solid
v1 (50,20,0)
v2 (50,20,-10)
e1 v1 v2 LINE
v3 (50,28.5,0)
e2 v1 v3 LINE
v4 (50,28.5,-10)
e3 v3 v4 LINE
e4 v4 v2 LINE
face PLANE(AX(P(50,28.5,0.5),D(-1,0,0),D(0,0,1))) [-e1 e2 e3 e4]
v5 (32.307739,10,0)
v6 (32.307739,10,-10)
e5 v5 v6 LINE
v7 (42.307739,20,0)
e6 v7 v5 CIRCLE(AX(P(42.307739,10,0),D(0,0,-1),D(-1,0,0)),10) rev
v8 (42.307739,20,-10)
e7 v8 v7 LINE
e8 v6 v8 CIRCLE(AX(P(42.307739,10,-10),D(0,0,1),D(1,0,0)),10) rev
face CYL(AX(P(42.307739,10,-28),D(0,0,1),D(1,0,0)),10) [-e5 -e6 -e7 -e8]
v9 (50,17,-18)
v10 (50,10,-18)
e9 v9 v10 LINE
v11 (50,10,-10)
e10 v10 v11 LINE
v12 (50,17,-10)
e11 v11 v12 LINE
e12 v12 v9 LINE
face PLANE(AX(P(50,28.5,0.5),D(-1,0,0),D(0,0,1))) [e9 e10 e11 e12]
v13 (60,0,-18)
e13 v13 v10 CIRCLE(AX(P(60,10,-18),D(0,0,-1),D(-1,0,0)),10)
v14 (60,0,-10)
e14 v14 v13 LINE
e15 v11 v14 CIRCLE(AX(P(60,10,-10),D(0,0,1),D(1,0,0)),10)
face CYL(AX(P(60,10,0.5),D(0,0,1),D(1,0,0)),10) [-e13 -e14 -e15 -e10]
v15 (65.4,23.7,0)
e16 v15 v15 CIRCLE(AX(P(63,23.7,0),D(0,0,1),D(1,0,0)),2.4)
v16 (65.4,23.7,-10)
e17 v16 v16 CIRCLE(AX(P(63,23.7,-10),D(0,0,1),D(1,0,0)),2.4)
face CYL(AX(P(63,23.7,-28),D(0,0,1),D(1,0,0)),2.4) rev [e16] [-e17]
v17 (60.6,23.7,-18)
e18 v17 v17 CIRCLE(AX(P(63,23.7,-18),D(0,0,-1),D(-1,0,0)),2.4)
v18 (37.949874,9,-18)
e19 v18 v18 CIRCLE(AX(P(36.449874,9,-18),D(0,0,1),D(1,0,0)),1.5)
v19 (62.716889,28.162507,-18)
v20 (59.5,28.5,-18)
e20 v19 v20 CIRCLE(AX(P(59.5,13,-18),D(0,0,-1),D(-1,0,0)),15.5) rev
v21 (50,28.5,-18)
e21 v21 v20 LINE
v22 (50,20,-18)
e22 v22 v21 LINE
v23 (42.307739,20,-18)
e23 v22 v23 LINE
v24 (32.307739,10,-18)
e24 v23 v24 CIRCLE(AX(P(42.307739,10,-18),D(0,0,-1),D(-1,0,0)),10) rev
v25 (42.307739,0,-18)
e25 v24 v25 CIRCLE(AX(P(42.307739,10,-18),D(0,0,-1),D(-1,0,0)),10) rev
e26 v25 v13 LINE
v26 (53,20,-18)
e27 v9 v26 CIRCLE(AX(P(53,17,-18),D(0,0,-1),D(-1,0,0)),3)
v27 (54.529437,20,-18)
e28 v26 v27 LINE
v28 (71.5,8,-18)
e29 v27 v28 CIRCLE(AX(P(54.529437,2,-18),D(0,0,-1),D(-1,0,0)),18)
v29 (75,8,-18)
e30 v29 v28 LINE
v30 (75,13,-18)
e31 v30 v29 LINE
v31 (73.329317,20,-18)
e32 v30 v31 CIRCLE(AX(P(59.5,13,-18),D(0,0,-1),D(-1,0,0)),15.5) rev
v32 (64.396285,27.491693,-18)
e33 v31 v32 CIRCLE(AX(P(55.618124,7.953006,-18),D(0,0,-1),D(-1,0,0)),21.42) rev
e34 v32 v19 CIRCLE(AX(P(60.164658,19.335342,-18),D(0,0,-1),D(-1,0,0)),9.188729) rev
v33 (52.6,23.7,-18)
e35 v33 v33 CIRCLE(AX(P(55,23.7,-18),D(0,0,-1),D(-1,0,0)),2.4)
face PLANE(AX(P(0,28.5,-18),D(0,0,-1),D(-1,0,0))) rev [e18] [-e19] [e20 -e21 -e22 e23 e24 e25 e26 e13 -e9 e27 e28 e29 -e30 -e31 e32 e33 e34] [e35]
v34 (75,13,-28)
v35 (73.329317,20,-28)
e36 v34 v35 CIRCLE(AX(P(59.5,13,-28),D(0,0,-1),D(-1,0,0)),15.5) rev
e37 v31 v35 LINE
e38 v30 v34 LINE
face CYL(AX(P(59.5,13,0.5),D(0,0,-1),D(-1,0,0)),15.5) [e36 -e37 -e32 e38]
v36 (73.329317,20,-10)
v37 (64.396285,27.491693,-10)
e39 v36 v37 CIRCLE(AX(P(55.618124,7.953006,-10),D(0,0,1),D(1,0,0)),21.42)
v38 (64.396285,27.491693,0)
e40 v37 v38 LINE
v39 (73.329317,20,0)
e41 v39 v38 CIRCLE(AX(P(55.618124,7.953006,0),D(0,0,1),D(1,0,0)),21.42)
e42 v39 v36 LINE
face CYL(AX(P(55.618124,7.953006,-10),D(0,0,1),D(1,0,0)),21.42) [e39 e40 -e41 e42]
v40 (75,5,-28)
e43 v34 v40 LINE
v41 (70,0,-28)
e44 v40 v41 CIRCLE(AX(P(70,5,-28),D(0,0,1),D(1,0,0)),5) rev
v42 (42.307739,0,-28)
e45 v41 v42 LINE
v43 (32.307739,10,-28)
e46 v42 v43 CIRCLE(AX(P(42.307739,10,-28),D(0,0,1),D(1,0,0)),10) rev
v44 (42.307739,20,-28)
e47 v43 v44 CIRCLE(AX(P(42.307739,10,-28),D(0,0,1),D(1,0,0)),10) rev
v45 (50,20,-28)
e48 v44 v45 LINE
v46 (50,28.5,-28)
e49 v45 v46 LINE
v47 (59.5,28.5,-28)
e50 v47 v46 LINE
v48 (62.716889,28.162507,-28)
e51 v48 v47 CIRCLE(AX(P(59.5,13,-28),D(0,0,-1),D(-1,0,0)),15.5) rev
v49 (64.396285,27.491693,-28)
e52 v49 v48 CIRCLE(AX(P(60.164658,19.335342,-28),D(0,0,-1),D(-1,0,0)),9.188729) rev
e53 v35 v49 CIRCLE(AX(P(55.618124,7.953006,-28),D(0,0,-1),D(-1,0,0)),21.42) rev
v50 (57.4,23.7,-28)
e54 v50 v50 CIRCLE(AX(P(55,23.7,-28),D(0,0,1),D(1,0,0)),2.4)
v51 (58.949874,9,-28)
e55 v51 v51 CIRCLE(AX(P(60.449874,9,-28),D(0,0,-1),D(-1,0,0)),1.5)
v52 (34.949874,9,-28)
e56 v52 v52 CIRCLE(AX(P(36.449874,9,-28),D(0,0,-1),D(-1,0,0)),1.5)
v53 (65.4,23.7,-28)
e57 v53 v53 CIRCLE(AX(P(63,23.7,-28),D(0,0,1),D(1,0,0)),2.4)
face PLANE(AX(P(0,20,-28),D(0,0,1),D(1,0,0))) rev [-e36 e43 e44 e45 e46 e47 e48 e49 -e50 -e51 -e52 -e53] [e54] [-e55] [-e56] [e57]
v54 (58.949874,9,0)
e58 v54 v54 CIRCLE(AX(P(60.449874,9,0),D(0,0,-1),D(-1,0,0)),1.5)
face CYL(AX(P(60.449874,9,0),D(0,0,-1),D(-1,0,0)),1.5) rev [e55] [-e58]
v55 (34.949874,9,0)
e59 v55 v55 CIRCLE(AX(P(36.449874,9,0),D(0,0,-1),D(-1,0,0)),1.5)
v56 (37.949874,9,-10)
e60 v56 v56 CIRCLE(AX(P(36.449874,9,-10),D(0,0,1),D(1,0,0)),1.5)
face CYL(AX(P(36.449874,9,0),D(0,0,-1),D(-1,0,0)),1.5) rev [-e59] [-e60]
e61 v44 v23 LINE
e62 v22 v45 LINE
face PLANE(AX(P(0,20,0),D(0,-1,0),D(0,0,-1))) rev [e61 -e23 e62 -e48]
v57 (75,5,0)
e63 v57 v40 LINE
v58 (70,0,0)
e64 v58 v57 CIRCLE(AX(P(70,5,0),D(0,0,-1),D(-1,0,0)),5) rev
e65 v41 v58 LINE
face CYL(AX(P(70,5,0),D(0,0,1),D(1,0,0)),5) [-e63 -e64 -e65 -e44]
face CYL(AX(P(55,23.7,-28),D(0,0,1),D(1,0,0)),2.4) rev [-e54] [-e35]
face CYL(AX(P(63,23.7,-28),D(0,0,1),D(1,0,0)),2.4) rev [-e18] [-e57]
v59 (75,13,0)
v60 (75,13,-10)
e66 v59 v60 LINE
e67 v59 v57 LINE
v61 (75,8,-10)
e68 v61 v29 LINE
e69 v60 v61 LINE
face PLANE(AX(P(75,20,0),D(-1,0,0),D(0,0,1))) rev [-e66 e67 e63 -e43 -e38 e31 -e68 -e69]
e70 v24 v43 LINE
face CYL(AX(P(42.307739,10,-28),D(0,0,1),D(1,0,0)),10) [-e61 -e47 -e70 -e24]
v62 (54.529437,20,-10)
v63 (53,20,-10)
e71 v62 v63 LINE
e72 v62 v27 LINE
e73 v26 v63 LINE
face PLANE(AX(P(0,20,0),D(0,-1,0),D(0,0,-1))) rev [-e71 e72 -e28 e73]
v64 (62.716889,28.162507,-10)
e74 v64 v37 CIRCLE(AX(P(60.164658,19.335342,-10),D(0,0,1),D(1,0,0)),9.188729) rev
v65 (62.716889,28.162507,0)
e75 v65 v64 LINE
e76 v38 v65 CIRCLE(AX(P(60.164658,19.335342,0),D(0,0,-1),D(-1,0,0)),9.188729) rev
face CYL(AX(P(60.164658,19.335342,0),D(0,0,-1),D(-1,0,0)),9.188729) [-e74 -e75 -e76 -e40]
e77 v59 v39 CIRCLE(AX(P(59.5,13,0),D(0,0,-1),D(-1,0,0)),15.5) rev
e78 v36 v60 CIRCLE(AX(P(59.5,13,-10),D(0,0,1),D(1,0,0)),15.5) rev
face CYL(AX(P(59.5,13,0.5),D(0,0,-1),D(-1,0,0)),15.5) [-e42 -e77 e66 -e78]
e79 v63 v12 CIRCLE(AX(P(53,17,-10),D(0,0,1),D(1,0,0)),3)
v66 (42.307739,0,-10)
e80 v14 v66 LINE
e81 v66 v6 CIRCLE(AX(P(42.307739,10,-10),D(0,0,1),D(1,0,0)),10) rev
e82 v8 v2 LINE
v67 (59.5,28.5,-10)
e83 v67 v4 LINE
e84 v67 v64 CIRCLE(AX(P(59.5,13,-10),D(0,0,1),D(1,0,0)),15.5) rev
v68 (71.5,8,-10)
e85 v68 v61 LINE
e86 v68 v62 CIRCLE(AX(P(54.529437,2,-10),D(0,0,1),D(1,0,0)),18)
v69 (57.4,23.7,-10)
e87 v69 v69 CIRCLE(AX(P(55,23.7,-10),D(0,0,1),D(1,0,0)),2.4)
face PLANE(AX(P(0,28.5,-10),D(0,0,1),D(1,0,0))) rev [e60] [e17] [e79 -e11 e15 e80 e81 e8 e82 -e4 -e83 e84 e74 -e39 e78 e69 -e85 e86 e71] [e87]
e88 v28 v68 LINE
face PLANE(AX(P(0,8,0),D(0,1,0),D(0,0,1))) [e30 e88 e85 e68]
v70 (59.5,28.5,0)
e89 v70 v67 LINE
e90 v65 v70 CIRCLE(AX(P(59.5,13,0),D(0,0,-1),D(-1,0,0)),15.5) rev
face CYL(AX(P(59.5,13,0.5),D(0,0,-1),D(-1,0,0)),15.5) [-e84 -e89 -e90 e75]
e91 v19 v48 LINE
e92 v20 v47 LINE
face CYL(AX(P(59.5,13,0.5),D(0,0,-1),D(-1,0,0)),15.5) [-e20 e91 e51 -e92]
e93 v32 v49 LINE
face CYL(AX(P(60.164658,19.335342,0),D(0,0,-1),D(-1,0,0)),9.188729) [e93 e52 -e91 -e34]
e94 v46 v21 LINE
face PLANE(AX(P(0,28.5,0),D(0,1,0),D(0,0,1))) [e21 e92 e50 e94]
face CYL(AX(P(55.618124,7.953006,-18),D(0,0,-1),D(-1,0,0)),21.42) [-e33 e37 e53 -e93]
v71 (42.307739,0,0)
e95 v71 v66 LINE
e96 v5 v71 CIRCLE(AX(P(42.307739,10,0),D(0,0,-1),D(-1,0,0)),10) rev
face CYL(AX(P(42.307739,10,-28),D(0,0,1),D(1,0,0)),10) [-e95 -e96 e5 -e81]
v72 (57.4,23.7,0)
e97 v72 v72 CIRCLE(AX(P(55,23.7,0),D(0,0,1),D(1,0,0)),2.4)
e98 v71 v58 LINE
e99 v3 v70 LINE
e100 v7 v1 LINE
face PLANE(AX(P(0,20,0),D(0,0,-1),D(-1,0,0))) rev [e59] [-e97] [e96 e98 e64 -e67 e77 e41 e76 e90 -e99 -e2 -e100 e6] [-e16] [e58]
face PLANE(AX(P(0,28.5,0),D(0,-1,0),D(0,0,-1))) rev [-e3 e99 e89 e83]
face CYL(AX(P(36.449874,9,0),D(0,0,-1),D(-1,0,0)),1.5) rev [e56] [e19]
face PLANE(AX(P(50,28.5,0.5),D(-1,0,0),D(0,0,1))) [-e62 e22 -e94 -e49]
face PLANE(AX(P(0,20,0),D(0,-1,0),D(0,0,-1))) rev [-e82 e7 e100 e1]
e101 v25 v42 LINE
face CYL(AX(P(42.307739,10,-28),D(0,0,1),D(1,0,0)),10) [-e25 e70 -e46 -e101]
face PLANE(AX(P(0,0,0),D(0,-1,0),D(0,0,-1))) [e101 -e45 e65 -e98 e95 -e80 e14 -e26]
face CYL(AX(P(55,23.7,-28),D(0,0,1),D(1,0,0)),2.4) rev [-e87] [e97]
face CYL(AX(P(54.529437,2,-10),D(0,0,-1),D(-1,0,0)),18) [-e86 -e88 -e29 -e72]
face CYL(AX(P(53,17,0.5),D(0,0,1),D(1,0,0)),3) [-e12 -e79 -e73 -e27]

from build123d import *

# Parameters (mm, degrees)
CROQUIS1_W                 = 75
CROQUIS1_H                 = 28
SALIENTE_EXTRUIR2_DEPTH    = 20
CROQUIS2_W                 = 75
CROQUIS2_H                 = 10
SALIENTE_EXTRUIR3_DEPTH    = 8.5
CROQUIS3_R                 = 2.4
CORTAR_EXTRUIR1_DEPTH      = 28
CROQUIS5_W                 = 3.5
CROQUIS5_H                 = 8
CORTAR_EXTRUIR2_DEPTH      = 12
REDONDEO1_R                = 18
CORTAR_EXTRUIR3_DEPTH      = 18.5
CORTAR_EXTRUIR3_DEPTH_BACK = 9.5
CROQUIS7_W                 = 50
CROQUIS7_H                 = 8.5
CROQUIS8_W                 = 50
CROQUIS8_H                 = 9
CORTAR_EXTRUIR4_DEPTH      = 20.5
REDONDEO2_R                = 10
REDONDEO5_R                = 10
CORTAR_EXTRUIR6_DEPTH      = 28.5
CROQUIS10_R                = 1.5
CORTAR_EXTRUIR7_DEPTH      = 85.977938313
REDONDEO6_R                = 10
REDONDEO7_R                = 3
REDONDEO8_R                = 5
CORTAR_EXTRUIR11_DEPTH     = 85.977938313
SALIENTE_EXTRUIR4_DEPTH    = 10
SALIENTE_EXTRUIR5_START    = -10
SALIENTE_EXTRUIR5_DEPTH    = 10
CORTAR_EXTRUIR12_START     = -0.5
CORTAR_EXTRUIR12_DEPTH     = 0.5
CROQUIS20_R                = 1.5
SALIENTE_EXTRUIR7_DEPTH    = 1
CORTAR_EXTRUIR13_DEPTH     = 85.977938313
CORTAR_EXTRUIR14_DEPTH     = 85.977938313
REDONDEO9_R                = 10


with BuildPart() as part:
    # Croquis1 → Saliente-Extruir2 (new body)
    with BuildSketch(Plane(origin=(0, 0, 0), x_dir=(1, 0, 0), z_dir=(0, 1, 0))):
        with Locations((37.5, 14)):
            Rectangle(CROQUIS1_W, CROQUIS1_H)
    extrude(amount=SALIENTE_EXTRUIR2_DEPTH)

    # Croquis2 → Saliente-Extruir3 (add)
    with BuildSketch(Plane(origin=(0, 20, 0), x_dir=(1, 0, 0), z_dir=(0, 1, 0))):
        with Locations((37.5, 5)):
            Rectangle(CROQUIS2_W, CROQUIS2_H)
        with Locations((37.5, 23)):
            Rectangle(CROQUIS2_W, CROQUIS2_H)
    extrude(amount=SALIENTE_EXTRUIR3_DEPTH)

    # Croquis3 → Cortar-Extruir1 (cut)
    with BuildSketch(Plane.XY):
        with Locations((63, 23.7)):
            Circle(CROQUIS3_R)
        with Locations((55, 23.7)):
            Circle(CROQUIS3_R)
    extrude(amount=-CORTAR_EXTRUIR1_DEPTH, mode=Mode.SUBTRACT)

    # Croquis5 → Cortar-Extruir2 (cut)
    with BuildSketch(Plane(origin=(0, 20, 0), x_dir=(1, 0, 0), z_dir=(0, 1, 0))):
        with Locations((73.25, 14)):
            Rectangle(CROQUIS5_W, CROQUIS5_H)
    extrude(amount=-CORTAR_EXTRUIR2_DEPTH, mode=Mode.SUBTRACT)

    # Redondeo1
    # the kernel refuses this fillet: 18 mm, written as the material it takes off along each edge
    with BuildSketch(Plane(origin=(71.5, 20, -10), x_dir=(0, -1, 0), z_dir=(0, 0, -1))) as redondeo1_piece_1:
        with BuildLine():
            CenterArc((18, 16.970562748), REDONDEO1_R, 180, 70.528779366)
            Line((0, 16.970562748), (0, 0))
            Line((0, 0), (12, 0))
        make_face()
    extrude(amount=8, mode=Mode.SUBTRACT)

    # Croquis7 → Cortar-Extruir3 (cut, two sides: drawn at the far end of the back side and taken through both)
    with BuildSketch(Plane.XY.offset(-18).offset(-CORTAR_EXTRUIR3_DEPTH_BACK)):
        with Locations((25, 24.25)):
            Rectangle(CROQUIS7_W, CROQUIS7_H)
    extrude(amount=CORTAR_EXTRUIR3_DEPTH + CORTAR_EXTRUIR3_DEPTH_BACK, mode=Mode.SUBTRACT)

    # Croquis8 → Cortar-Extruir4 (cut)
    with BuildSketch(Plane(origin=(0, 20, 0), x_dir=(1, 0, 0), z_dir=(0, 1, 0))):
        with Locations((25, 14.5)):
            Rectangle(CROQUIS8_W, CROQUIS8_H)
    extrude(amount=-CORTAR_EXTRUIR4_DEPTH, mode=Mode.SUBTRACT)

    # Redondeo2
    redondeo2_edges = [part.edges().sort_by_distance(p)[0] for p in [
        (0, 20, -5),
        (0, 20, -23.25),
    ]]
    fillet(redondeo2_edges, radius=REDONDEO2_R)

    # Redondeo5
    # the kernel refuses this fillet: 10 mm, written as the material it takes off along each edge
    with BuildSketch(Plane(origin=(0, 0, -35), x_dir=(1, 0, 0), z_dir=(0, 0, 1))) as redondeo5_piece_1:
        with BuildLine():
            CenterArc((REDONDEO5_R, REDONDEO5_R), REDONDEO5_R, 180, 90)
            Line((0, REDONDEO5_R), (0, 0))
            Line((0, 0), (REDONDEO5_R, 0))
        make_face()
    extrude(amount=60, mode=Mode.SUBTRACT)

    # Croquis9 → Cortar-Extruir6 (cut)
    with BuildSketch(Plane(origin=(0, 0, -28), x_dir=(-1, 0, 0), z_dir=(0, 0, -1))):
        with BuildLine():
            Line((-75, 28.5), (-59.5, 28.5))
            ThreePointArc((-59.5, 28.5), (-70.460155108, 23.960155108), (-75, 13))
            Line((-75, 13), (-75, 28.5))
        make_face()
    extrude(amount=-CORTAR_EXTRUIR6_DEPTH, mode=Mode.SUBTRACT)

    # Croquis10 → Cortar-Extruir7 (cut, through all)
    with BuildSketch(Plane(origin=(0, 0, -28), x_dir=(-1, 0, 0), z_dir=(0, 0, -1))):
        with Locations((-60.449874371, 9)):
            Circle(CROQUIS10_R)
        with Locations((-36.449874371, 9)):
            Circle(CROQUIS10_R)
        with Locations((-12.449874371, 9)):
            Circle(CROQUIS10_R)
    extrude(amount=-CORTAR_EXTRUIR7_DEPTH, mode=Mode.SUBTRACT)

    # Redondeo6
    redondeo6_edges = [part.edges().sort_by_distance(p)[0] for p in [
        (50, 0, -14.5),
    ]]
    fillet(redondeo6_edges, radius=REDONDEO6_R)

    # Redondeo7
    # the kernel refuses this fillet: 3 mm, written as the material it takes off along each edge
    with BuildSketch(Plane(origin=(50, 20, -18), x_dir=(0, -1, 0), z_dir=(0, 0, 1))) as redondeo7_piece_1:
        with BuildLine():
            CenterArc((REDONDEO7_R, REDONDEO7_R), REDONDEO7_R, 180, 90)
            Line((0, REDONDEO7_R), (0, 0))
            Line((0, 0), (REDONDEO7_R, 0))
        make_face()
    extrude(amount=8, mode=Mode.SUBTRACT)

    # Redondeo8
    redondeo8_edges = [part.edges().sort_by_distance(p)[0] for p in [
        (75, 0, -14),
    ]]
    fillet(redondeo8_edges, radius=REDONDEO8_R)

    # Croquis16 → Cortar-Extruir11 (cut, through all)
    with BuildSketch(Plane(origin=(0, 0, -28), x_dir=(-1, 0, 0), z_dir=(0, 0, -1))):
        with BuildLine():
            Line((-73.329316686, 20), (-69.329316686, 20))
            ThreePointArc((-69.329316686, 20), (-67.304546525, 25.119348054), (-62.716889054, 28.162507207))
            ThreePointArc((-62.716889054, 28.162507207), (-68.949863148, 25.286174608), (-73.329316686, 20))
        make_face()
    extrude(amount=-CORTAR_EXTRUIR11_DEPTH, mode=Mode.SUBTRACT)

    # Croquis17 → Saliente-Extruir4 (add)
    with BuildSketch(Plane(origin=(0, 0, -28), x_dir=(-1, 0, 0), z_dir=(0, 0, -1))):
        with BuildLine():
            Line((-73.329316686, 20), (-69.329316686, 20))
            ThreePointArc((-69.329316686, 20), (-67.839062436, 24.388682638), (-64.39628475, 27.491693244))
            ThreePointArc((-64.39628475, 27.491693244), (-69.382310449, 24.36530565), (-73.329316686, 20))
        make_face()
    extrude(amount=-SALIENTE_EXTRUIR4_DEPTH)

    # Croquis18 → Saliente-Extruir5 (add)
    with BuildSketch(Plane.XY.offset(SALIENTE_EXTRUIR5_START)):
        with BuildLine():
            ThreePointArc((64.39628475, 27.491693244), (67.839062436, 24.388682638), (69.329316686, 20))
            Line((69.329316686, 20), (73.329316686, 20))
            ThreePointArc((73.329316686, 20), (69.382310449, 24.36530565), (64.39628475, 27.491693244))
        make_face()
    extrude(amount=SALIENTE_EXTRUIR5_DEPTH)

    # Croquis19 → Cortar-Extruir12 (cut)
    with BuildSketch(Plane.XY.offset(-27.5).offset(CORTAR_EXTRUIR12_START)):
        with BuildLine():
            Line((50, 20), (50, 28.5))
            Line((50, 28.5), (0, 28.5))
            Line((0, 28.5), (0, 10))
            ThreePointArc((0, 10), (2.928932188, 17.071067812), (10, 20))
            Line((10, 20), (50, 20))
        make_face()
    extrude(amount=CORTAR_EXTRUIR12_DEPTH, mode=Mode.SUBTRACT)

    # Croquis20 → Saliente-Extruir7 (add)
    with BuildSketch(Plane.XY.offset(-19)):
        with BuildLine():
            Line((50, 20), (50, 10))
            ThreePointArc((50, 10), (52.928932188, 2.928932188), (60, 0))
            Line((60, 0), (10, 0))
            ThreePointArc((10, 0), (0, 10), (10, 20))
            Line((10, 20), (50, 20))
        make_face()
        with Locations(Location((12.449874371, 9, 0), (0, 0, 180))):
            Circle(CROQUIS20_R, mode=Mode.SUBTRACT)
        with Locations(Location((36.449874371, 9, 0), (0, 0, 180))):
            Circle(CROQUIS20_R, mode=Mode.SUBTRACT)
    extrude(amount=SALIENTE_EXTRUIR7_DEPTH)

    # Croquis21 → Cortar-Extruir13 (cut, through all)
    with BuildSketch(Plane.XY):
        with BuildLine():
            Line((10, 20), (36.449874371, 20))
            ThreePointArc((36.449874371, 20), (26.449874371, 10), (36.449874371, 0))
            Line((36.449874371, 0), (10, 0))
            ThreePointArc((10, 0), (0, 10), (10, 20))
        make_face()
    extrude(amount=-CORTAR_EXTRUIR13_DEPTH, mode=Mode.SUBTRACT)

    # Croquis22 → Cortar-Extruir14 (cut, through all)
    with BuildSketch(Plane.XY):
        with BuildLine():
            ThreePointArc((36.449874371, 0), (32.307738747, 10), (36.449874371, 20))
            ThreePointArc((36.449874371, 20), (26.449874371, 10), (36.449874371, 0))
        make_face()
    extrude(amount=-CORTAR_EXTRUIR14_DEPTH, mode=Mode.SUBTRACT)

    # Redondeo9
    # the kernel refuses this fillet: 10 mm, written as the material it takes off along each edge
    with BuildSketch(Plane(origin=(36.449874371, 20, 27.059805007), x_dir=(-0.3826834323650891, -0.9238795325112871, 0), z_dir=(0, 0, -1)), Plane(origin=(36.449874371, 20, 9.059805007), x_dir=(-0.3826834323650891, -0.9238795325112871, 0), z_dir=(0, 0, -1))) as redondeo9_piece_1:
        with BuildLine():
            CenterArc((6.997087679, -9.238795325), REDONDEO9_R, 67.5, 90)
            Line((-2.241707646, -5.411961001), (0, 0))
            ThreePointArc((0, 0), (5.411961001, 1.076505975), (10.823922003, 0))
        make_face()
    extrude(amount=64.119610015, mode=Mode.SUBTRACT)
    with BuildSketch(Plane(origin=(36.449874371, 0, 27.059805007), x_dir=(1, 0, 0), z_dir=(0, 0, -1)), Plane(origin=(36.449874371, 0, 9.059805007), x_dir=(1, 0, 0), z_dir=(0, 0, -1))) as redondeo9_piece_2:
        with BuildLine():
            CenterArc((5.857864376, -10), REDONDEO9_R, 90, 90)
            ThreePointArc((-4.142135624, -10), (-3.065629649, -4.588038999), (0, 0))
            Line((0, 0), (5.857864376, 0))
        make_face()
    extrude(amount=64.119610015, mode=Mode.SUBTRACT)


solid = part.part
